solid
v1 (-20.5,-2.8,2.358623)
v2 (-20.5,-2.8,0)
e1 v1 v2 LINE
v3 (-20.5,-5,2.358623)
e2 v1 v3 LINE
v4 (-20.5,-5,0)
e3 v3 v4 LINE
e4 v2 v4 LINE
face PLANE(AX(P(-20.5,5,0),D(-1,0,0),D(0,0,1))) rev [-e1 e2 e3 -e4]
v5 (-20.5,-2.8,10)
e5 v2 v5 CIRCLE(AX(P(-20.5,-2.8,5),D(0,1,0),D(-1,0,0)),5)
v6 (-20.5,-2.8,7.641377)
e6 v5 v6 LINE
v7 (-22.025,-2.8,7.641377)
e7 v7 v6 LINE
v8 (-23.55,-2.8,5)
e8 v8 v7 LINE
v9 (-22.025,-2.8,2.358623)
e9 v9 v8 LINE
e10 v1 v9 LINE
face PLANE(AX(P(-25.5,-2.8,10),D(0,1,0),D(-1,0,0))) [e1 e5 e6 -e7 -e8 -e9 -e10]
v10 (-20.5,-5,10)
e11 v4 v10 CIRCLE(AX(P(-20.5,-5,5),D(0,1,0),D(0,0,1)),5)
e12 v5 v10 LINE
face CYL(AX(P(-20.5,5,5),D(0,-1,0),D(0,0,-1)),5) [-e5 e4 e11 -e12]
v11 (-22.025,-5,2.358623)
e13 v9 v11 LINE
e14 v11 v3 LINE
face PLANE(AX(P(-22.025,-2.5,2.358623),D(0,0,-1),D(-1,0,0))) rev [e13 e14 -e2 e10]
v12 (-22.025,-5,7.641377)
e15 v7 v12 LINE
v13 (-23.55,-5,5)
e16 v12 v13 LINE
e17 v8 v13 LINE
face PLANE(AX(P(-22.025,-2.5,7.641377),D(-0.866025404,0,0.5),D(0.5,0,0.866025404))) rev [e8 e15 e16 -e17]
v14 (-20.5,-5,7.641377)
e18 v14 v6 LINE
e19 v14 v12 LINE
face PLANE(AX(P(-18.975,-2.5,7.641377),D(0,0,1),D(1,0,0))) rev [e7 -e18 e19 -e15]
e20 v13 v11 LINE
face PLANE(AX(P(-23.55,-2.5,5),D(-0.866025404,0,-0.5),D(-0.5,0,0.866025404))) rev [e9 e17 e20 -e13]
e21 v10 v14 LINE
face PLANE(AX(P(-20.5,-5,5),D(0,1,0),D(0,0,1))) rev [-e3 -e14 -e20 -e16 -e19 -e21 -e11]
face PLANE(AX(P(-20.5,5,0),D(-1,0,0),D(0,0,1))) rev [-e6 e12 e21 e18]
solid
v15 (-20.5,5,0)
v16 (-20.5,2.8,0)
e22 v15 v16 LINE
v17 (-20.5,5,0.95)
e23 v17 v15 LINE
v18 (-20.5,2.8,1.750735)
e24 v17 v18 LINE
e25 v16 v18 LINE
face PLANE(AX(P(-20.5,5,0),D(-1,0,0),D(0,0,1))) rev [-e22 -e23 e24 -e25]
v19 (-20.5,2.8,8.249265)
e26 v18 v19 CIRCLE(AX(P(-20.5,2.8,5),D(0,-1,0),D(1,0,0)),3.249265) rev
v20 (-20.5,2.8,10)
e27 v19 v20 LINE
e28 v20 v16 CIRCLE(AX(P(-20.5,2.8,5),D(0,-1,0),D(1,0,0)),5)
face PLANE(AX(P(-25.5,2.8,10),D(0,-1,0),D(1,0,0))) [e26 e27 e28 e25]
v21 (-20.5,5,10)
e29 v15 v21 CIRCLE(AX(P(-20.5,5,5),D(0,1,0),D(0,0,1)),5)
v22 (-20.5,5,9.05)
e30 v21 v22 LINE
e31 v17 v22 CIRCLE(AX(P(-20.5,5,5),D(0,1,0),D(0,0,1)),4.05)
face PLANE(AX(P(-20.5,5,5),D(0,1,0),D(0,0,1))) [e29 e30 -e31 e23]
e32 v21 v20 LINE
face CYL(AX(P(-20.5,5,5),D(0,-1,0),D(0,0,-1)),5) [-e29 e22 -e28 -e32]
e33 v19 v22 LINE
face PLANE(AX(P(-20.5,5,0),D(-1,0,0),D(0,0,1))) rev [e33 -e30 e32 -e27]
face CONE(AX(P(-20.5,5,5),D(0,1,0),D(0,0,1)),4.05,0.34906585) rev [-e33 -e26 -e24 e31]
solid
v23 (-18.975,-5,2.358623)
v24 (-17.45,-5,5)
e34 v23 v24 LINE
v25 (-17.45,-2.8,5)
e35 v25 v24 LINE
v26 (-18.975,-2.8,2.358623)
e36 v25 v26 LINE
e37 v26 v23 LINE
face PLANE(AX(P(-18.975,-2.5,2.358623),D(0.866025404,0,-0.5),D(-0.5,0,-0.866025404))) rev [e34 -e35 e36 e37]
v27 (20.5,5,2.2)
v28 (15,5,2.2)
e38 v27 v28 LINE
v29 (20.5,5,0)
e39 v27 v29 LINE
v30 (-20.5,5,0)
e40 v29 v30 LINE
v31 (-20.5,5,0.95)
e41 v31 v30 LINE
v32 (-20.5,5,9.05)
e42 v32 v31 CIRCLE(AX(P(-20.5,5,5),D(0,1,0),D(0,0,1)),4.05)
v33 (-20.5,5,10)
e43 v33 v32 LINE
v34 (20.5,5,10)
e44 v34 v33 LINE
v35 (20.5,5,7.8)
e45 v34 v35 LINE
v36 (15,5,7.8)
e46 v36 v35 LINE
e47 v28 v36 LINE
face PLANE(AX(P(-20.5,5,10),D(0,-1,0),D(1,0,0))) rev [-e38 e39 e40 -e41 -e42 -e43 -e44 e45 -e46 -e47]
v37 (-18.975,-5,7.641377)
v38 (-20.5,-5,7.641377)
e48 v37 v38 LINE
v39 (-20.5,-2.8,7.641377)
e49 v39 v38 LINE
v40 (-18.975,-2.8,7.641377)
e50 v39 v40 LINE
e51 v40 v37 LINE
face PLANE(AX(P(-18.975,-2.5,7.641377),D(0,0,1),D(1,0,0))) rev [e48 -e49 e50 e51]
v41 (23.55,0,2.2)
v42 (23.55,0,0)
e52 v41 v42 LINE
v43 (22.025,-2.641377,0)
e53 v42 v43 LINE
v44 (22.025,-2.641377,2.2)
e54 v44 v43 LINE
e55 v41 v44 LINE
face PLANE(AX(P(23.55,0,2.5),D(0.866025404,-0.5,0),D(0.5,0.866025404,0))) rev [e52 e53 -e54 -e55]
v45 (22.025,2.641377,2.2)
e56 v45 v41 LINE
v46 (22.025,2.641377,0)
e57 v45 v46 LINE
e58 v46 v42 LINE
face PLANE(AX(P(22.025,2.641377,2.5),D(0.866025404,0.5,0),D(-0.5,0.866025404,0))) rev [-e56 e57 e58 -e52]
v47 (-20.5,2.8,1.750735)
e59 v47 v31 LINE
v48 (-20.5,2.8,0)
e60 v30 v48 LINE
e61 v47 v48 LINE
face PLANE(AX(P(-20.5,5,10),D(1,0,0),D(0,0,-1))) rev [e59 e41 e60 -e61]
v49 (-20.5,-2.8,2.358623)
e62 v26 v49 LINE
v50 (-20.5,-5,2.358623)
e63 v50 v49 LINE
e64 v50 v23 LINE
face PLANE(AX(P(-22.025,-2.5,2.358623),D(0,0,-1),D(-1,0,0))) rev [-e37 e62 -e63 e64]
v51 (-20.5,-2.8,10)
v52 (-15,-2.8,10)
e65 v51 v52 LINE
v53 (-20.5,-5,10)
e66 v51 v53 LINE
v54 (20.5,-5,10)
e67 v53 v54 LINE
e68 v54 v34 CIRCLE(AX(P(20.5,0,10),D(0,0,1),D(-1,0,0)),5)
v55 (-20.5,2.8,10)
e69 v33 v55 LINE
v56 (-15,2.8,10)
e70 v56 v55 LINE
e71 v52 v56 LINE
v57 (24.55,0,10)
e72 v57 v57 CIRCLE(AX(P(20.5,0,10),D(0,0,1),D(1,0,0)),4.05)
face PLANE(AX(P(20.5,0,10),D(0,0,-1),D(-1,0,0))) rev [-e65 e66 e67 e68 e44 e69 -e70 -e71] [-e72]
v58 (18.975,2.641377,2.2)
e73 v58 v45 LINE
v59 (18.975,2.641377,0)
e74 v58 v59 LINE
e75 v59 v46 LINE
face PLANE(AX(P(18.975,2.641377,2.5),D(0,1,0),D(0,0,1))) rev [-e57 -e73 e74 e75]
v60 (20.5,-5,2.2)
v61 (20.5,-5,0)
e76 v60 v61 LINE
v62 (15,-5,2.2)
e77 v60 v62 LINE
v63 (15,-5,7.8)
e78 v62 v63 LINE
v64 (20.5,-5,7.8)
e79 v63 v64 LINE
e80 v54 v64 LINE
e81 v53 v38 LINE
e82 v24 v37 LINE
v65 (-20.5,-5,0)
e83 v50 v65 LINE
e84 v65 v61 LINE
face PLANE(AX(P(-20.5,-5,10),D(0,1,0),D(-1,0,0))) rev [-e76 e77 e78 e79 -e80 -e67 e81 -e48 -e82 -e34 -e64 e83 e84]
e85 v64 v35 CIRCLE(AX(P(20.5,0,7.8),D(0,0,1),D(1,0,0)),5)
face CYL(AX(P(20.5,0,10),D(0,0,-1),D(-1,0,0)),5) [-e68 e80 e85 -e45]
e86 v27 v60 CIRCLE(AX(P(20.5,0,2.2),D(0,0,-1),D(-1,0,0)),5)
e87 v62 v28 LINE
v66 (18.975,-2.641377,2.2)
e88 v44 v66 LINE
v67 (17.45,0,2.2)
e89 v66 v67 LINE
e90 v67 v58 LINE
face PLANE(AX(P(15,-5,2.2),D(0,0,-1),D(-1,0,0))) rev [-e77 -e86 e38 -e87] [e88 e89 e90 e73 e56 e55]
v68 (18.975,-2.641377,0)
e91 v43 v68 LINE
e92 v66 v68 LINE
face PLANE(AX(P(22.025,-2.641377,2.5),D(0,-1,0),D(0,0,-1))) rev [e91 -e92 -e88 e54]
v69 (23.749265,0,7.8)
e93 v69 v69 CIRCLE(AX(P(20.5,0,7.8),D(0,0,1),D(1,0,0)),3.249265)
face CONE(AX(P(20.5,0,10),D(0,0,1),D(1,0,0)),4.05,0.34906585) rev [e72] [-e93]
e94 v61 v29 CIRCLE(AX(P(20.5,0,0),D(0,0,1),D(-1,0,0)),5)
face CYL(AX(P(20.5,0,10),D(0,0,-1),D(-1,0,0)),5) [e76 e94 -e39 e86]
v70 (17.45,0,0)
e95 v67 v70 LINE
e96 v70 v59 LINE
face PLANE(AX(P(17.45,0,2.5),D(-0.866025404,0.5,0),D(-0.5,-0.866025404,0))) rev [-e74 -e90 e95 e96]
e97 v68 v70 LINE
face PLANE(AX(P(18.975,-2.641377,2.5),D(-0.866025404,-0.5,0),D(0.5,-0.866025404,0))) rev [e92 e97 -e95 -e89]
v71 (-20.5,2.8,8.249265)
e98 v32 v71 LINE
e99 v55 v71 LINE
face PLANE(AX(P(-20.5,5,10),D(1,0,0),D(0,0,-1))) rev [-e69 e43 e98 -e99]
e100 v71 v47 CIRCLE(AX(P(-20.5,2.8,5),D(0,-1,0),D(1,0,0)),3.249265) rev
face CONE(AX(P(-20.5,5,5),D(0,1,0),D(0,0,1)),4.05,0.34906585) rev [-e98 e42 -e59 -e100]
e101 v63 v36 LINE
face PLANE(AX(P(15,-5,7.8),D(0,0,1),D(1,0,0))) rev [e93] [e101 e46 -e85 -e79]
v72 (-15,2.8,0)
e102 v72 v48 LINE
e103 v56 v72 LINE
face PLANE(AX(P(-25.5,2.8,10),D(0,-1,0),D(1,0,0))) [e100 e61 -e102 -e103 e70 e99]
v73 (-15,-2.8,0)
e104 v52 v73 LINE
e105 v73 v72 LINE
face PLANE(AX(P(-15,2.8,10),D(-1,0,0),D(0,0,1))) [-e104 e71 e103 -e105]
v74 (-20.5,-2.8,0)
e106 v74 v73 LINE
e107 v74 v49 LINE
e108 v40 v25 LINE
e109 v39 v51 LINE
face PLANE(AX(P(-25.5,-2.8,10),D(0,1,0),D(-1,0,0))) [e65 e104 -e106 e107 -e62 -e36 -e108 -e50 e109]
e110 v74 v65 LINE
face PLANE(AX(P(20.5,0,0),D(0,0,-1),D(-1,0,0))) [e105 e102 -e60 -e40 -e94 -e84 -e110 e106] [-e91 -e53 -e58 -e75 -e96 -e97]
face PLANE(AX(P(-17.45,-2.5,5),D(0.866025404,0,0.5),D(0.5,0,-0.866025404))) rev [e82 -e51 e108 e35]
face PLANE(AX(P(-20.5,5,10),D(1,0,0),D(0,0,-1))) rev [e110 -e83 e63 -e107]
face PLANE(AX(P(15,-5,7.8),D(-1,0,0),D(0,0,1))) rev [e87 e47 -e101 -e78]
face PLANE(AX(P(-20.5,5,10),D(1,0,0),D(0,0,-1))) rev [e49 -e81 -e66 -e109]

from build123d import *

# Parameters (mm, degrees)
EXTRUDE_1_DEPTH      = 10
SKETCH_3_W           = 10.5
SKETCH_3_H           = 5.6
CUT_EXTRUDE_2_DEPTH  = 30.159046624
EXTRUDE_5_DEPTH      = 5
SKETCH_2_R           = 4.05
CUT_EXTRUDE_4_DEPTH  = 2.4
CUT_EXTRUDE_4_DRAFT  = -20
SKETCH_11_W          = 10.5
SKETCH_11_H          = 5.6
CUT_EXTRUDE_11_DEPTH = 28.843311585
CUT_EXTRUDE_13_DEPTH = 2.5
CUT_EXTRUDE_14_DEPTH = 2.5


# Read off the part's stored shape, not the designer's step: 除料-伸長10
with BuildPart() as part:
    # 草圖1 → 填料-伸長1 (new body)
    with BuildSketch(Plane.XY):
        with BuildLine():
            Line((-20.5, 5), (-20.5, -5))
            Line((-20.5, -5), (20.5, -5))
            ThreePointArc((20.5, -5), (25.5, 0), (20.5, 5))
            Line((20.5, 5), (-20.5, 5))
        make_face()
    extrude(amount=EXTRUDE_1_DEPTH)

    # 草圖3 → 除料-伸長2 (cut, through all)
    with BuildSketch(Plane(origin=(0, 5, 0), x_dir=(1, 0, 0), z_dir=(0, 1, 0))):
        with Locations((20.25, -5)):
            Rectangle(SKETCH_3_W, SKETCH_3_H)
    extrude(amount=-CUT_EXTRUDE_2_DEPTH, mode=Mode.SUBTRACT)


with BuildPart() as body_2:
    # 草圖10 → 填料-伸長5 (new, symmetric)
    with BuildSketch(Plane(origin=(0, 0, 0), x_dir=(1, 0, 0), z_dir=(0, 1, 0))):
        with BuildLine():
            Line((-20.5, 0), (-20.5, -10))
            ThreePointArc((-20.5, -10), (-25.5, -5), (-20.5, 0))
        make_face()
    extrude(amount=EXTRUDE_5_DEPTH, both=True)


with BuildPart() as cut_extrude_4_tool:
    # 草圖2 → 除料-伸長4 (with draft: the straight prism first)
    with BuildSketch(Plane.XY.offset(10)):
        with Locations((20.5, 0)):
            Circle(SKETCH_2_R)
    extrude(amount=-CUT_EXTRUDE_4_DEPTH)
    # 除料-伸長4: the draft: its side faces are tilted about the plane it starts from
    cut_extrude_4_sides = [cut_extrude_4_tool.faces().sort_by_distance(p)[0] for p in [
        (16.45, 0, 8.8),
    ]]
    draft(cut_extrude_4_sides, Plane.XY.offset(10), CUT_EXTRUDE_4_DRAFT)


with BuildPart() as part_1:
    add(part.part)

    # 除料-伸長4: cut by cut_extrude_4_tool
    add(cut_extrude_4_tool.part, mode=Mode.SUBTRACT)


with BuildPart() as cut_extrude_10_tool:
    # 除料-伸長10 outline → 除料-伸長10 (revolve)
    with BuildSketch(Plane(origin=(-20.5, 0, 5), x_dir=(1, 0, 0), z_dir=(0, 0, 1))):
        Polygon((0, 5), (0, 2), (2.958089297, 2), (4.05, 5), align=None)
    revolve(axis=Axis((-20.5, 0, 5), (0, 1, 0)))


with BuildPart() as part_2:
    add(part_1.part)

    # 除料-伸長10: cut by cut_extrude_10_tool
    add(cut_extrude_10_tool.part, mode=Mode.SUBTRACT)


with BuildPart() as body_2_1:
    add(body_2.part)

    # 除料-伸長10: cut by cut_extrude_10_tool
    add(cut_extrude_10_tool.part, mode=Mode.SUBTRACT)


with BuildPart() as cut_extrude_11_tool:
    # 草圖11 → 除料-伸長11 (new, through all)
    with BuildSketch(Plane.XY):
        with Locations((-20.25, 0)):
            Rectangle(SKETCH_11_W, SKETCH_11_H)
    extrude(amount=CUT_EXTRUDE_11_DEPTH)


with BuildPart() as part_3:
    add(part_2.part)

    # 除料-伸長11: cut by cut_extrude_11_tool
    add(cut_extrude_11_tool.part, mode=Mode.SUBTRACT)

    # 草圖15 → 除料-伸長13 (cut)
    with BuildSketch(Plane(origin=(0, 0, 0), x_dir=(-1, 0, 0), z_dir=(0, 0, -1))):
        Polygon((-18.975, 2.641377482), (-22.025, 2.641377482), (-23.55, 0), (-22.025, -2.641377482), (-18.975, -2.641377482), (-17.45, 0), align=None)
    extrude(amount=-CUT_EXTRUDE_13_DEPTH, mode=Mode.SUBTRACT)


with BuildPart() as body_2_2:
    add(body_2_1.part)

    # 除料-伸長11: cut by cut_extrude_11_tool
    add(cut_extrude_11_tool.part, mode=Mode.SUBTRACT)


with BuildPart() as cut_extrude_14_tool:
    # 草圖16 → 除料-伸長14 (new body)
    with BuildSketch(Plane.XZ.offset(5)):
        Polygon((-17.45, 5), (-18.975, 7.641377482), (-22.025, 7.641377482), (-23.55, 5), (-22.025, 2.358622518), (-18.975, 2.358622518), align=None)
    extrude(amount=-CUT_EXTRUDE_14_DEPTH)


with BuildPart() as part_4:
    add(part_3.part)

    # 除料-伸長14: cut by cut_extrude_14_tool
    add(cut_extrude_14_tool.part, mode=Mode.SUBTRACT)


with BuildPart() as body_2_3:
    add(body_2_2.part)

    # 除料-伸長14: cut by cut_extrude_14_tool
    add(cut_extrude_14_tool.part, mode=Mode.SUBTRACT)


solid = Compound([part_4.part, body_2_3.part])
